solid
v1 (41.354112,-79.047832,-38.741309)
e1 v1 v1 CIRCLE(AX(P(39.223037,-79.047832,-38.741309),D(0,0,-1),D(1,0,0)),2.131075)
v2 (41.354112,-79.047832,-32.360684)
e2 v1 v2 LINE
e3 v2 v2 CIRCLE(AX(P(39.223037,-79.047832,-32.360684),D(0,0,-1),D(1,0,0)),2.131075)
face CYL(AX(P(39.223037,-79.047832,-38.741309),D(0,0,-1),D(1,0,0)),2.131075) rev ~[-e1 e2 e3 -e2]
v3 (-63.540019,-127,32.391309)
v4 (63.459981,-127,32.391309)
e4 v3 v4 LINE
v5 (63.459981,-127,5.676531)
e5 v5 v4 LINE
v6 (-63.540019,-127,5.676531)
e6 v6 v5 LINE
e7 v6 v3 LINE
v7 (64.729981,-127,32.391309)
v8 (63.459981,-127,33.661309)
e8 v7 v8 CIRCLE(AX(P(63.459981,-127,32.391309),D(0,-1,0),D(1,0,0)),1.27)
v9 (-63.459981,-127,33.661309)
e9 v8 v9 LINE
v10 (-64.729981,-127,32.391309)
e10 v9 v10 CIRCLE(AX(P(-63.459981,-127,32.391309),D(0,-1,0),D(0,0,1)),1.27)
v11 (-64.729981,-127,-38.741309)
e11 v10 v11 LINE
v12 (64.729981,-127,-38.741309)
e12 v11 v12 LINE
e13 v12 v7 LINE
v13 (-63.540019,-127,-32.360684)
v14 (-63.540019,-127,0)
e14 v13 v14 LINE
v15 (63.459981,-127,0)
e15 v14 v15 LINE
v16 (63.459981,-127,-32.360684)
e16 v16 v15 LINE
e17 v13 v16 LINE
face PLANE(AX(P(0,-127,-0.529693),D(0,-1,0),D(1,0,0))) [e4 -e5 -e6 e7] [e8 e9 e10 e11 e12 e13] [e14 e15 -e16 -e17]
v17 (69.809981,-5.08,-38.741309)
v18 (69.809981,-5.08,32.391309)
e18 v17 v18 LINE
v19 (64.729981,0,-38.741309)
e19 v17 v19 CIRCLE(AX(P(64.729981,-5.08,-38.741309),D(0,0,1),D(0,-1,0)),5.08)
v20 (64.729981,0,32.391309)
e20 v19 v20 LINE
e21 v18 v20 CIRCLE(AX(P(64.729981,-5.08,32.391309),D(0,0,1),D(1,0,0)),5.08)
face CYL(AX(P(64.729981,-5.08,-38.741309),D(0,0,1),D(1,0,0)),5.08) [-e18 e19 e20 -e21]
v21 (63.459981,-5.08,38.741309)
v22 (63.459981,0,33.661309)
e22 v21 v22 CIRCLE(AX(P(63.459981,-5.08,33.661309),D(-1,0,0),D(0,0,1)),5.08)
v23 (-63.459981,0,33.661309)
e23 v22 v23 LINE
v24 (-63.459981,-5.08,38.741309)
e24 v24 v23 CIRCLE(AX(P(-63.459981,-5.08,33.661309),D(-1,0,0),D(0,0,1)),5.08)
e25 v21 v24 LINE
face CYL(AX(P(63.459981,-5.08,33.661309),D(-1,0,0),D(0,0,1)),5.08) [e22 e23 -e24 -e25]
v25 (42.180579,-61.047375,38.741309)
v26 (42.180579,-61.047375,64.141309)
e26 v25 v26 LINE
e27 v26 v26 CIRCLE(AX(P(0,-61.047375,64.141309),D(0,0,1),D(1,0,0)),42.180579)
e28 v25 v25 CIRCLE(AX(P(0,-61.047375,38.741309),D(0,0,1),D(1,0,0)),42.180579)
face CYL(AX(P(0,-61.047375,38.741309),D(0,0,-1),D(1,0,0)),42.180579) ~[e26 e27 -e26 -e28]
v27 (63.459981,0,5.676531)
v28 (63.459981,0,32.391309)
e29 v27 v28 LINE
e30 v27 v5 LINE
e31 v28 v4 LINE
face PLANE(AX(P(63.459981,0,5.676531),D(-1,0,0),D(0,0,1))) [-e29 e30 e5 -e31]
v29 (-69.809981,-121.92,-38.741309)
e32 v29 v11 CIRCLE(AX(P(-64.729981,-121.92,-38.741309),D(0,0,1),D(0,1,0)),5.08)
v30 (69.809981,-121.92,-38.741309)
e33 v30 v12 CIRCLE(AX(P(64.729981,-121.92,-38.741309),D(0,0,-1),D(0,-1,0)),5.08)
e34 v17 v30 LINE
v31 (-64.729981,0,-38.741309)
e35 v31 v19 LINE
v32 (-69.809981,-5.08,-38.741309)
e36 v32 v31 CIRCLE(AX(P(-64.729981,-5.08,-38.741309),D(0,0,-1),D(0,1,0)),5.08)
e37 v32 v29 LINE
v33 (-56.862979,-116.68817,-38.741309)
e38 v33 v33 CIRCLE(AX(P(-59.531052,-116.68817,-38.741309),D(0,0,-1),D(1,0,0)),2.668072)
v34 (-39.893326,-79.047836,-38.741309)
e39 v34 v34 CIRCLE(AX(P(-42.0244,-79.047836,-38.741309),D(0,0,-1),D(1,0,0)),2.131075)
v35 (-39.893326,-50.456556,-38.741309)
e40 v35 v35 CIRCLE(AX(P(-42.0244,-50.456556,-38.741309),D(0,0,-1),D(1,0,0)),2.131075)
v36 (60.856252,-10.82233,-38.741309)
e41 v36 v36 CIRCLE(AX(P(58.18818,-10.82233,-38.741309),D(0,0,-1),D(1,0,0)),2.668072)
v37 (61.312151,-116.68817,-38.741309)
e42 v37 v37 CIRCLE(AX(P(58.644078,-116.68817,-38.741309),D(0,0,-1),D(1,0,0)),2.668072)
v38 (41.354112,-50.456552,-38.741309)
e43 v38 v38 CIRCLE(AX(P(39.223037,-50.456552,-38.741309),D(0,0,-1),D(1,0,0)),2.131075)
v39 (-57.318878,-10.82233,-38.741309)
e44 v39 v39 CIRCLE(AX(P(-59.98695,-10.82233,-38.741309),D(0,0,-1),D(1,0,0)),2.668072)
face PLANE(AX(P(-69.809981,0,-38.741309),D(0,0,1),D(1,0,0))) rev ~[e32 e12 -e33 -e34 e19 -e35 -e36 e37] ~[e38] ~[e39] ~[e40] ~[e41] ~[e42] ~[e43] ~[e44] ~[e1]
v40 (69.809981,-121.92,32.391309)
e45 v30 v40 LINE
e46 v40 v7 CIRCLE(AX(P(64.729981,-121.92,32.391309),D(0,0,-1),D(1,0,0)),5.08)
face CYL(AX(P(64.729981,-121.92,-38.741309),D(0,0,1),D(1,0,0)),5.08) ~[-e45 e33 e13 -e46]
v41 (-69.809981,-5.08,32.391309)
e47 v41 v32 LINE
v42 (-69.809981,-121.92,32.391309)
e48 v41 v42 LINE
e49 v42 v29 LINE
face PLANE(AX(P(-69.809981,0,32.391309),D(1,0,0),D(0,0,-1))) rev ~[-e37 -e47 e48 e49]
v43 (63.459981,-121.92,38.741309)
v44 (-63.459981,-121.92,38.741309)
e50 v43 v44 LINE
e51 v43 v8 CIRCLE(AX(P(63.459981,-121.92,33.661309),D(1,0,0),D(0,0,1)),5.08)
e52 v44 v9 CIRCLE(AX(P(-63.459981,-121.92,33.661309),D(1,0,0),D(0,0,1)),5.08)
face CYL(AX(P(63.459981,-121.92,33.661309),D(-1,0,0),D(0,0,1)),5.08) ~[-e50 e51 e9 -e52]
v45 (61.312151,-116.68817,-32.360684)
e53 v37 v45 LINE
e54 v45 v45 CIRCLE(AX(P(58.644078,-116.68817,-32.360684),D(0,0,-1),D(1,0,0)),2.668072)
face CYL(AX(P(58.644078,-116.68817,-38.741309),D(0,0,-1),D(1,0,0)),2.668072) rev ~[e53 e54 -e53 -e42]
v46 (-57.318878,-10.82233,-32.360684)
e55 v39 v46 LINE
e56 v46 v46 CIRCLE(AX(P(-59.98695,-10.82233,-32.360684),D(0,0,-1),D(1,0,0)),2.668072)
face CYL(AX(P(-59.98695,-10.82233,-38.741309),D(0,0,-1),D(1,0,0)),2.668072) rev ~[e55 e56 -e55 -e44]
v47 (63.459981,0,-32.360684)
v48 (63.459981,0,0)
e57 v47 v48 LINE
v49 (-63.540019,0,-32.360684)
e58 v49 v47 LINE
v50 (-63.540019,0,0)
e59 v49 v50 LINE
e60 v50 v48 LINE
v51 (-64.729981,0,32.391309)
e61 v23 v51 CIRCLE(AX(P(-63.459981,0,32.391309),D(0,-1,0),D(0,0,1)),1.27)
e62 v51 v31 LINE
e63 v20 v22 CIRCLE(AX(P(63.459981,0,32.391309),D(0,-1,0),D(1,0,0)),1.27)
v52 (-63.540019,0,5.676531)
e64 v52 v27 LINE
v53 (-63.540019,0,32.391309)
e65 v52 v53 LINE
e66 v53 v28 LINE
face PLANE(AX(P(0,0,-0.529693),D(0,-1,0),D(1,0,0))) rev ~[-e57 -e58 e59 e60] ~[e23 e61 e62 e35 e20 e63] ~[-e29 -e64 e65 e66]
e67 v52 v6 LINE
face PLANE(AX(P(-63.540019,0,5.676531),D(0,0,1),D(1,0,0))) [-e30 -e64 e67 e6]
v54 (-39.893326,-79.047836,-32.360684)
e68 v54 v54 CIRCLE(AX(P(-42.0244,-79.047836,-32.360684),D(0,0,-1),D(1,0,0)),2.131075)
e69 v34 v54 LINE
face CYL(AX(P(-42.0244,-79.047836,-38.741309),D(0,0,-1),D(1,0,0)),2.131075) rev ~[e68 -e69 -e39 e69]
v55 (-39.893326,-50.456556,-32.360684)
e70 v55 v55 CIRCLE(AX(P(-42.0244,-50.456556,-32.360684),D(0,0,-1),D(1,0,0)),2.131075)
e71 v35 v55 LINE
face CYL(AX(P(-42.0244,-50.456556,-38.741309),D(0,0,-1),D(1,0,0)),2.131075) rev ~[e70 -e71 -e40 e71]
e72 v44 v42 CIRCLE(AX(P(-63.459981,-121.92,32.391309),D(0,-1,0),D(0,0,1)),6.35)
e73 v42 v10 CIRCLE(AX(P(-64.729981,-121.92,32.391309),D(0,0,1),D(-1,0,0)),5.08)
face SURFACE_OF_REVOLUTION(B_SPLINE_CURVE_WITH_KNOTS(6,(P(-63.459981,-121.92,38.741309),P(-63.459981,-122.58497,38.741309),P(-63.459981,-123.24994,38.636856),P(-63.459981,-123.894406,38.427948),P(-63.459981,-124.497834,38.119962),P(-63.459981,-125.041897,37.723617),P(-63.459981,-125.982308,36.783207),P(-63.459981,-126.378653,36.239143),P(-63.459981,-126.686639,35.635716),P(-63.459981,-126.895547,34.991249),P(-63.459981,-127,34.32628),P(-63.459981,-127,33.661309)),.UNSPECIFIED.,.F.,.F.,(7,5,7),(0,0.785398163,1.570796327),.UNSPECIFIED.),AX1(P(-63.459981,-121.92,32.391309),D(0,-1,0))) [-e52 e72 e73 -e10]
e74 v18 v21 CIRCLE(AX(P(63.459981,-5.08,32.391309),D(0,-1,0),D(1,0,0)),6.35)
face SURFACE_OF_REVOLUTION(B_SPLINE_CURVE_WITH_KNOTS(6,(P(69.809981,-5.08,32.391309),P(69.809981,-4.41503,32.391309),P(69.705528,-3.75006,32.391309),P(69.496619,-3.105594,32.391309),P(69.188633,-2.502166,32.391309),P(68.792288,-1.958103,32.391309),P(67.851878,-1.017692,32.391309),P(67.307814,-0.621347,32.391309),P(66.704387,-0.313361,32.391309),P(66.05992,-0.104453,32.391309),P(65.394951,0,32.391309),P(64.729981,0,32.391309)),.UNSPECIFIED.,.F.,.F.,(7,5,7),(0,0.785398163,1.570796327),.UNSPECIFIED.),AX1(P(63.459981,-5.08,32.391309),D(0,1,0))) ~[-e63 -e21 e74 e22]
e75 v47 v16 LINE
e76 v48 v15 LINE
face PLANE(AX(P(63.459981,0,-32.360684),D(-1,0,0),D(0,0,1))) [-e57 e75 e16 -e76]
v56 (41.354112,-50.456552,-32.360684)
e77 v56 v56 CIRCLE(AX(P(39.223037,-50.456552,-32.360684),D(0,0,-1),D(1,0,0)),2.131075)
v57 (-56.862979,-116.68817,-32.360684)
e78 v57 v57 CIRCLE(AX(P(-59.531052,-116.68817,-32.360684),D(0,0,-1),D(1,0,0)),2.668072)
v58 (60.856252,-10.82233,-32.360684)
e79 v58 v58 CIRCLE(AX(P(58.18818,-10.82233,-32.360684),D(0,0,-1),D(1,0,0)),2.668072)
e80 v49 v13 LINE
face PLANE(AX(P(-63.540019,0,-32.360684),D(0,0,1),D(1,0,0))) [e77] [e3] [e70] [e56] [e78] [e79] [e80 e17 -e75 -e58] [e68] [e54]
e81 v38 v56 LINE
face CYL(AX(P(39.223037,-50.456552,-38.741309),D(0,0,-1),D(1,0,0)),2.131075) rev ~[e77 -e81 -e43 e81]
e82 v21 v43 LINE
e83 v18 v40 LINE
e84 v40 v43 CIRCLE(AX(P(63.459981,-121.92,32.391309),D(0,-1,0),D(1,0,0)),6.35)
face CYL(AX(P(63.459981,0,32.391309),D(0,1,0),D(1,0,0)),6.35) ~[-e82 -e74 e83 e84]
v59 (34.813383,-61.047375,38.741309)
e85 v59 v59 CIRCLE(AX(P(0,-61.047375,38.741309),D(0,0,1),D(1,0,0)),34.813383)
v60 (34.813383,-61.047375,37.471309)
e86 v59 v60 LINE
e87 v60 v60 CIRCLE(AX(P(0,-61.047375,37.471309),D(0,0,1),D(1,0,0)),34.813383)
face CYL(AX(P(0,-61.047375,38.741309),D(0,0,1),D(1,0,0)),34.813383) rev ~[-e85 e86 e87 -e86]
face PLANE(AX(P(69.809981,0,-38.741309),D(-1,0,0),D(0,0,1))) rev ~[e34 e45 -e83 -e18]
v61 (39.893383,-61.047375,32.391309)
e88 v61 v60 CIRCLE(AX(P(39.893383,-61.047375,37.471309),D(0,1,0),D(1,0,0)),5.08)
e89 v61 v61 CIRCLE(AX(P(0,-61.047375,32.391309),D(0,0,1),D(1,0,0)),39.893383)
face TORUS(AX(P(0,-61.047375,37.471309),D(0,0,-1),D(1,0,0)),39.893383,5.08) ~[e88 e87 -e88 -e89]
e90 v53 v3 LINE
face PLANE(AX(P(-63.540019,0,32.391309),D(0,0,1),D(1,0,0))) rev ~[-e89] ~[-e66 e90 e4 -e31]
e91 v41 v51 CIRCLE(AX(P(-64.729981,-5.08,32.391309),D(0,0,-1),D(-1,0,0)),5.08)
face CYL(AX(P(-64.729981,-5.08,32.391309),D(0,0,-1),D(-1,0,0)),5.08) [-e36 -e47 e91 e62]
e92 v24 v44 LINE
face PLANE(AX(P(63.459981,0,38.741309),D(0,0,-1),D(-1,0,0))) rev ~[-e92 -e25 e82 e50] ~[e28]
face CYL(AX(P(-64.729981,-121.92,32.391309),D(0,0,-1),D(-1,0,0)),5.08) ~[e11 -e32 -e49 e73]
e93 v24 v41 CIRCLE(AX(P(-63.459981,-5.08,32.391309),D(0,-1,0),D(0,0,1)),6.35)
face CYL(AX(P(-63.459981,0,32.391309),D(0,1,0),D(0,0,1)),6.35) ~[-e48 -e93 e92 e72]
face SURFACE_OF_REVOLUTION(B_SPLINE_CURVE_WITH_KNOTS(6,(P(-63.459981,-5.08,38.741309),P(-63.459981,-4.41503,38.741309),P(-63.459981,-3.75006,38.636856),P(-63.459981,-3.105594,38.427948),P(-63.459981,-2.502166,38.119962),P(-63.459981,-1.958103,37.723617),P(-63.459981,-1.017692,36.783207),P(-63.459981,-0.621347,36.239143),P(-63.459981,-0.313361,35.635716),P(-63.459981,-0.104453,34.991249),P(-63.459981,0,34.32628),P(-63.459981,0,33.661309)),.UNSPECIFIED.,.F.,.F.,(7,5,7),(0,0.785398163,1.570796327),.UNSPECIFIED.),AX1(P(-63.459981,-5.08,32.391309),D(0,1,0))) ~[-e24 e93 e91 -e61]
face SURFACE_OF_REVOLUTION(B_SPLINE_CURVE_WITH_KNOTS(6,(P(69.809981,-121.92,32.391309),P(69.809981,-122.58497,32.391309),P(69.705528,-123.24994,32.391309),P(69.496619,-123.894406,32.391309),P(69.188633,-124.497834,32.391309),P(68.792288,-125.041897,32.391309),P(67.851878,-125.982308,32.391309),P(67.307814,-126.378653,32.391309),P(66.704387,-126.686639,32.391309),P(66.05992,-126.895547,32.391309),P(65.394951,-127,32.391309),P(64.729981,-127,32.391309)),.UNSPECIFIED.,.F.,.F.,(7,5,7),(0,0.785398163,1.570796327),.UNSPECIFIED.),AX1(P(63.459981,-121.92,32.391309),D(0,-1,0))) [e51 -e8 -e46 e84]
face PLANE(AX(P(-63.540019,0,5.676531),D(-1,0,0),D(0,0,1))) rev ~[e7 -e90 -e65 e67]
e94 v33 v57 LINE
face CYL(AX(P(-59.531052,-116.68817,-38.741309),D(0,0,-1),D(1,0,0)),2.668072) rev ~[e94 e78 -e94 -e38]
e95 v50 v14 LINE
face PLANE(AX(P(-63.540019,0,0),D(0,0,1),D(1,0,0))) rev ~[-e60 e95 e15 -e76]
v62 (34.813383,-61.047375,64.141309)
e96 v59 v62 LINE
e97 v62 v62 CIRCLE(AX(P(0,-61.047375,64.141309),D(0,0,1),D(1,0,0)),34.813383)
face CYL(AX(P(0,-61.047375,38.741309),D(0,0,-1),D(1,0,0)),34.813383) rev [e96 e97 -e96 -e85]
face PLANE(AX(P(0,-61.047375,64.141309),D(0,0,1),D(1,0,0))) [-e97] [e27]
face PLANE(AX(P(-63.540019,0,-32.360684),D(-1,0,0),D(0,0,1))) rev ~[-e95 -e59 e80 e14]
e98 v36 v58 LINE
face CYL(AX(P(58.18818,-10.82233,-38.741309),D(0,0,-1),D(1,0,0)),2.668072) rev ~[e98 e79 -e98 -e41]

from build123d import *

# Parameters (mm, degrees)
F0_W     = 127
F0_H     = 32.3606841266
F0_H_2   = 26.7147784284
F1_DEPTH = 127
F2_R     = 5.08
F3_R     = 2.1310745611
F4_DEPTH = 25.4
F5_R     = 2.6680723022
F6_DEPTH = 25.4
F7_R     = 42.1805785401
F7_R_2   = 34.8133831429
F8_DEPTH = 25.4
F9_DEPTH = 25.4
F10_R    = 5.08


with BuildPart() as f1:
    # F0 (on Front) → F1 (new body)
    with BuildSketch(Plane.XZ):
        with BuildLine():
            ThreePointArc((69.8099806905, 32.3913091956), (67.950108751, 36.8814372561), (63.4599806905, 38.7413091956))
            Line((63.4599806905, 38.7413091956), (-63.4599806905, 38.7413091956))
            ThreePointArc((-63.4599806905, 38.7413091956), (-67.950108751, 36.8814372561), (-69.8099806905, 32.3913091956))
            Line((-69.8099806905, 32.3913091956), (-69.8099806905, -38.7413091956))
            Line((-69.8099806905, -38.7413091956), (69.8099806905, -38.7413091956))
            Line((69.8099806905, -38.7413091956), (69.8099806905, 32.3913091956))
        make_face()
        with Locations((-0.0400193095, -16.1803420633)):
            Rectangle(F0_W, F0_H, mode=Mode.SUBTRACT)
        with Locations((-0.0400193095, 19.0339199814)):
            Rectangle(F0_W, F0_H_2, mode=Mode.SUBTRACT)
    extrude(amount=F1_DEPTH)

    # F2
    f2_edges = [f1.edges().sort_by_distance(p)[0] for p in [
        (69.809981, -127, -3.175),
        (67.950109, -127, 36.881437),
        (0, -127, 38.741309),
        (-67.950109, -127, 36.881437),
        (-69.809981, -127, -3.175),
        (69.809981, 0, -3.175),
        (67.950109, 0, 36.881437),
        (0, 0, 38.741309),
        (-67.950109, 0, 36.881437),
        (-69.809981, 0, -3.175),
    ]]
    fillet(f2_edges, radius=F2_R)

    # F3 (on face) → F4 (cut)
    with BuildSketch(Plane(origin=(0, 0, -38.7413091956), x_dir=(1, 0, 0), z_dir=(0, 0, -1))):
        with Locations((-42.0244000852, 79.0478363633)):
            Circle(F3_R)
        with Locations((-42.0244000852, 50.4565563633)):
            Circle(F3_R)
        with Locations((39.2230374546, 79.047831549)):
            Circle(F3_R)
        with Locations((39.2230374546, 50.456551549)):
            Circle(F3_R)
    extrude(amount=-F4_DEPTH, mode=Mode.SUBTRACT)

    # F5 (on face) → F6 (cut)
    with BuildSketch(Plane(origin=(0, 0, -38.7413091956), x_dir=(1, 0, 0), z_dir=(0, 0, -1))):
        with Locations((-59.5310516655, 116.688169539)):
            Circle(F5_R)
        with Locations((-59.98695, 10.82233)):
            Circle(F5_R)
        with Locations((58.6440783345, 116.688169539)):
            Circle(F5_R)
        with Locations((58.18818, 10.82233)):
            Circle(F5_R)
    extrude(amount=-F6_DEPTH, mode=Mode.SUBTRACT)

    # F7 (on face) → F8 (join)
    with BuildSketch(Plane.XY.offset(38.7413091956)):
        with Locations((0, -61.0473752022)):
            Circle(F7_R)
        with Locations((0, -61.0473752022)):
            Circle(F7_R_2, mode=Mode.SUBTRACT)
    extrude(amount=F8_DEPTH)

    # F9 (cut): a face of the model
    f9_faces = [f1.faces().sort_by_distance(p)[0] for p in [
        (0, -61.0473752022, 38.7413091956),
    ]]
    extrude(f9_faces, amount=-F9_DEPTH, mode=Mode.SUBTRACT)

    # F10
    f10_edges = [f1.edges().sort_by_distance(p)[0] for p in [
        (-34.813383, -61.047375, 32.391309),
    ]]
    fillet(f10_edges, radius=F10_R)


solid = f1.part
